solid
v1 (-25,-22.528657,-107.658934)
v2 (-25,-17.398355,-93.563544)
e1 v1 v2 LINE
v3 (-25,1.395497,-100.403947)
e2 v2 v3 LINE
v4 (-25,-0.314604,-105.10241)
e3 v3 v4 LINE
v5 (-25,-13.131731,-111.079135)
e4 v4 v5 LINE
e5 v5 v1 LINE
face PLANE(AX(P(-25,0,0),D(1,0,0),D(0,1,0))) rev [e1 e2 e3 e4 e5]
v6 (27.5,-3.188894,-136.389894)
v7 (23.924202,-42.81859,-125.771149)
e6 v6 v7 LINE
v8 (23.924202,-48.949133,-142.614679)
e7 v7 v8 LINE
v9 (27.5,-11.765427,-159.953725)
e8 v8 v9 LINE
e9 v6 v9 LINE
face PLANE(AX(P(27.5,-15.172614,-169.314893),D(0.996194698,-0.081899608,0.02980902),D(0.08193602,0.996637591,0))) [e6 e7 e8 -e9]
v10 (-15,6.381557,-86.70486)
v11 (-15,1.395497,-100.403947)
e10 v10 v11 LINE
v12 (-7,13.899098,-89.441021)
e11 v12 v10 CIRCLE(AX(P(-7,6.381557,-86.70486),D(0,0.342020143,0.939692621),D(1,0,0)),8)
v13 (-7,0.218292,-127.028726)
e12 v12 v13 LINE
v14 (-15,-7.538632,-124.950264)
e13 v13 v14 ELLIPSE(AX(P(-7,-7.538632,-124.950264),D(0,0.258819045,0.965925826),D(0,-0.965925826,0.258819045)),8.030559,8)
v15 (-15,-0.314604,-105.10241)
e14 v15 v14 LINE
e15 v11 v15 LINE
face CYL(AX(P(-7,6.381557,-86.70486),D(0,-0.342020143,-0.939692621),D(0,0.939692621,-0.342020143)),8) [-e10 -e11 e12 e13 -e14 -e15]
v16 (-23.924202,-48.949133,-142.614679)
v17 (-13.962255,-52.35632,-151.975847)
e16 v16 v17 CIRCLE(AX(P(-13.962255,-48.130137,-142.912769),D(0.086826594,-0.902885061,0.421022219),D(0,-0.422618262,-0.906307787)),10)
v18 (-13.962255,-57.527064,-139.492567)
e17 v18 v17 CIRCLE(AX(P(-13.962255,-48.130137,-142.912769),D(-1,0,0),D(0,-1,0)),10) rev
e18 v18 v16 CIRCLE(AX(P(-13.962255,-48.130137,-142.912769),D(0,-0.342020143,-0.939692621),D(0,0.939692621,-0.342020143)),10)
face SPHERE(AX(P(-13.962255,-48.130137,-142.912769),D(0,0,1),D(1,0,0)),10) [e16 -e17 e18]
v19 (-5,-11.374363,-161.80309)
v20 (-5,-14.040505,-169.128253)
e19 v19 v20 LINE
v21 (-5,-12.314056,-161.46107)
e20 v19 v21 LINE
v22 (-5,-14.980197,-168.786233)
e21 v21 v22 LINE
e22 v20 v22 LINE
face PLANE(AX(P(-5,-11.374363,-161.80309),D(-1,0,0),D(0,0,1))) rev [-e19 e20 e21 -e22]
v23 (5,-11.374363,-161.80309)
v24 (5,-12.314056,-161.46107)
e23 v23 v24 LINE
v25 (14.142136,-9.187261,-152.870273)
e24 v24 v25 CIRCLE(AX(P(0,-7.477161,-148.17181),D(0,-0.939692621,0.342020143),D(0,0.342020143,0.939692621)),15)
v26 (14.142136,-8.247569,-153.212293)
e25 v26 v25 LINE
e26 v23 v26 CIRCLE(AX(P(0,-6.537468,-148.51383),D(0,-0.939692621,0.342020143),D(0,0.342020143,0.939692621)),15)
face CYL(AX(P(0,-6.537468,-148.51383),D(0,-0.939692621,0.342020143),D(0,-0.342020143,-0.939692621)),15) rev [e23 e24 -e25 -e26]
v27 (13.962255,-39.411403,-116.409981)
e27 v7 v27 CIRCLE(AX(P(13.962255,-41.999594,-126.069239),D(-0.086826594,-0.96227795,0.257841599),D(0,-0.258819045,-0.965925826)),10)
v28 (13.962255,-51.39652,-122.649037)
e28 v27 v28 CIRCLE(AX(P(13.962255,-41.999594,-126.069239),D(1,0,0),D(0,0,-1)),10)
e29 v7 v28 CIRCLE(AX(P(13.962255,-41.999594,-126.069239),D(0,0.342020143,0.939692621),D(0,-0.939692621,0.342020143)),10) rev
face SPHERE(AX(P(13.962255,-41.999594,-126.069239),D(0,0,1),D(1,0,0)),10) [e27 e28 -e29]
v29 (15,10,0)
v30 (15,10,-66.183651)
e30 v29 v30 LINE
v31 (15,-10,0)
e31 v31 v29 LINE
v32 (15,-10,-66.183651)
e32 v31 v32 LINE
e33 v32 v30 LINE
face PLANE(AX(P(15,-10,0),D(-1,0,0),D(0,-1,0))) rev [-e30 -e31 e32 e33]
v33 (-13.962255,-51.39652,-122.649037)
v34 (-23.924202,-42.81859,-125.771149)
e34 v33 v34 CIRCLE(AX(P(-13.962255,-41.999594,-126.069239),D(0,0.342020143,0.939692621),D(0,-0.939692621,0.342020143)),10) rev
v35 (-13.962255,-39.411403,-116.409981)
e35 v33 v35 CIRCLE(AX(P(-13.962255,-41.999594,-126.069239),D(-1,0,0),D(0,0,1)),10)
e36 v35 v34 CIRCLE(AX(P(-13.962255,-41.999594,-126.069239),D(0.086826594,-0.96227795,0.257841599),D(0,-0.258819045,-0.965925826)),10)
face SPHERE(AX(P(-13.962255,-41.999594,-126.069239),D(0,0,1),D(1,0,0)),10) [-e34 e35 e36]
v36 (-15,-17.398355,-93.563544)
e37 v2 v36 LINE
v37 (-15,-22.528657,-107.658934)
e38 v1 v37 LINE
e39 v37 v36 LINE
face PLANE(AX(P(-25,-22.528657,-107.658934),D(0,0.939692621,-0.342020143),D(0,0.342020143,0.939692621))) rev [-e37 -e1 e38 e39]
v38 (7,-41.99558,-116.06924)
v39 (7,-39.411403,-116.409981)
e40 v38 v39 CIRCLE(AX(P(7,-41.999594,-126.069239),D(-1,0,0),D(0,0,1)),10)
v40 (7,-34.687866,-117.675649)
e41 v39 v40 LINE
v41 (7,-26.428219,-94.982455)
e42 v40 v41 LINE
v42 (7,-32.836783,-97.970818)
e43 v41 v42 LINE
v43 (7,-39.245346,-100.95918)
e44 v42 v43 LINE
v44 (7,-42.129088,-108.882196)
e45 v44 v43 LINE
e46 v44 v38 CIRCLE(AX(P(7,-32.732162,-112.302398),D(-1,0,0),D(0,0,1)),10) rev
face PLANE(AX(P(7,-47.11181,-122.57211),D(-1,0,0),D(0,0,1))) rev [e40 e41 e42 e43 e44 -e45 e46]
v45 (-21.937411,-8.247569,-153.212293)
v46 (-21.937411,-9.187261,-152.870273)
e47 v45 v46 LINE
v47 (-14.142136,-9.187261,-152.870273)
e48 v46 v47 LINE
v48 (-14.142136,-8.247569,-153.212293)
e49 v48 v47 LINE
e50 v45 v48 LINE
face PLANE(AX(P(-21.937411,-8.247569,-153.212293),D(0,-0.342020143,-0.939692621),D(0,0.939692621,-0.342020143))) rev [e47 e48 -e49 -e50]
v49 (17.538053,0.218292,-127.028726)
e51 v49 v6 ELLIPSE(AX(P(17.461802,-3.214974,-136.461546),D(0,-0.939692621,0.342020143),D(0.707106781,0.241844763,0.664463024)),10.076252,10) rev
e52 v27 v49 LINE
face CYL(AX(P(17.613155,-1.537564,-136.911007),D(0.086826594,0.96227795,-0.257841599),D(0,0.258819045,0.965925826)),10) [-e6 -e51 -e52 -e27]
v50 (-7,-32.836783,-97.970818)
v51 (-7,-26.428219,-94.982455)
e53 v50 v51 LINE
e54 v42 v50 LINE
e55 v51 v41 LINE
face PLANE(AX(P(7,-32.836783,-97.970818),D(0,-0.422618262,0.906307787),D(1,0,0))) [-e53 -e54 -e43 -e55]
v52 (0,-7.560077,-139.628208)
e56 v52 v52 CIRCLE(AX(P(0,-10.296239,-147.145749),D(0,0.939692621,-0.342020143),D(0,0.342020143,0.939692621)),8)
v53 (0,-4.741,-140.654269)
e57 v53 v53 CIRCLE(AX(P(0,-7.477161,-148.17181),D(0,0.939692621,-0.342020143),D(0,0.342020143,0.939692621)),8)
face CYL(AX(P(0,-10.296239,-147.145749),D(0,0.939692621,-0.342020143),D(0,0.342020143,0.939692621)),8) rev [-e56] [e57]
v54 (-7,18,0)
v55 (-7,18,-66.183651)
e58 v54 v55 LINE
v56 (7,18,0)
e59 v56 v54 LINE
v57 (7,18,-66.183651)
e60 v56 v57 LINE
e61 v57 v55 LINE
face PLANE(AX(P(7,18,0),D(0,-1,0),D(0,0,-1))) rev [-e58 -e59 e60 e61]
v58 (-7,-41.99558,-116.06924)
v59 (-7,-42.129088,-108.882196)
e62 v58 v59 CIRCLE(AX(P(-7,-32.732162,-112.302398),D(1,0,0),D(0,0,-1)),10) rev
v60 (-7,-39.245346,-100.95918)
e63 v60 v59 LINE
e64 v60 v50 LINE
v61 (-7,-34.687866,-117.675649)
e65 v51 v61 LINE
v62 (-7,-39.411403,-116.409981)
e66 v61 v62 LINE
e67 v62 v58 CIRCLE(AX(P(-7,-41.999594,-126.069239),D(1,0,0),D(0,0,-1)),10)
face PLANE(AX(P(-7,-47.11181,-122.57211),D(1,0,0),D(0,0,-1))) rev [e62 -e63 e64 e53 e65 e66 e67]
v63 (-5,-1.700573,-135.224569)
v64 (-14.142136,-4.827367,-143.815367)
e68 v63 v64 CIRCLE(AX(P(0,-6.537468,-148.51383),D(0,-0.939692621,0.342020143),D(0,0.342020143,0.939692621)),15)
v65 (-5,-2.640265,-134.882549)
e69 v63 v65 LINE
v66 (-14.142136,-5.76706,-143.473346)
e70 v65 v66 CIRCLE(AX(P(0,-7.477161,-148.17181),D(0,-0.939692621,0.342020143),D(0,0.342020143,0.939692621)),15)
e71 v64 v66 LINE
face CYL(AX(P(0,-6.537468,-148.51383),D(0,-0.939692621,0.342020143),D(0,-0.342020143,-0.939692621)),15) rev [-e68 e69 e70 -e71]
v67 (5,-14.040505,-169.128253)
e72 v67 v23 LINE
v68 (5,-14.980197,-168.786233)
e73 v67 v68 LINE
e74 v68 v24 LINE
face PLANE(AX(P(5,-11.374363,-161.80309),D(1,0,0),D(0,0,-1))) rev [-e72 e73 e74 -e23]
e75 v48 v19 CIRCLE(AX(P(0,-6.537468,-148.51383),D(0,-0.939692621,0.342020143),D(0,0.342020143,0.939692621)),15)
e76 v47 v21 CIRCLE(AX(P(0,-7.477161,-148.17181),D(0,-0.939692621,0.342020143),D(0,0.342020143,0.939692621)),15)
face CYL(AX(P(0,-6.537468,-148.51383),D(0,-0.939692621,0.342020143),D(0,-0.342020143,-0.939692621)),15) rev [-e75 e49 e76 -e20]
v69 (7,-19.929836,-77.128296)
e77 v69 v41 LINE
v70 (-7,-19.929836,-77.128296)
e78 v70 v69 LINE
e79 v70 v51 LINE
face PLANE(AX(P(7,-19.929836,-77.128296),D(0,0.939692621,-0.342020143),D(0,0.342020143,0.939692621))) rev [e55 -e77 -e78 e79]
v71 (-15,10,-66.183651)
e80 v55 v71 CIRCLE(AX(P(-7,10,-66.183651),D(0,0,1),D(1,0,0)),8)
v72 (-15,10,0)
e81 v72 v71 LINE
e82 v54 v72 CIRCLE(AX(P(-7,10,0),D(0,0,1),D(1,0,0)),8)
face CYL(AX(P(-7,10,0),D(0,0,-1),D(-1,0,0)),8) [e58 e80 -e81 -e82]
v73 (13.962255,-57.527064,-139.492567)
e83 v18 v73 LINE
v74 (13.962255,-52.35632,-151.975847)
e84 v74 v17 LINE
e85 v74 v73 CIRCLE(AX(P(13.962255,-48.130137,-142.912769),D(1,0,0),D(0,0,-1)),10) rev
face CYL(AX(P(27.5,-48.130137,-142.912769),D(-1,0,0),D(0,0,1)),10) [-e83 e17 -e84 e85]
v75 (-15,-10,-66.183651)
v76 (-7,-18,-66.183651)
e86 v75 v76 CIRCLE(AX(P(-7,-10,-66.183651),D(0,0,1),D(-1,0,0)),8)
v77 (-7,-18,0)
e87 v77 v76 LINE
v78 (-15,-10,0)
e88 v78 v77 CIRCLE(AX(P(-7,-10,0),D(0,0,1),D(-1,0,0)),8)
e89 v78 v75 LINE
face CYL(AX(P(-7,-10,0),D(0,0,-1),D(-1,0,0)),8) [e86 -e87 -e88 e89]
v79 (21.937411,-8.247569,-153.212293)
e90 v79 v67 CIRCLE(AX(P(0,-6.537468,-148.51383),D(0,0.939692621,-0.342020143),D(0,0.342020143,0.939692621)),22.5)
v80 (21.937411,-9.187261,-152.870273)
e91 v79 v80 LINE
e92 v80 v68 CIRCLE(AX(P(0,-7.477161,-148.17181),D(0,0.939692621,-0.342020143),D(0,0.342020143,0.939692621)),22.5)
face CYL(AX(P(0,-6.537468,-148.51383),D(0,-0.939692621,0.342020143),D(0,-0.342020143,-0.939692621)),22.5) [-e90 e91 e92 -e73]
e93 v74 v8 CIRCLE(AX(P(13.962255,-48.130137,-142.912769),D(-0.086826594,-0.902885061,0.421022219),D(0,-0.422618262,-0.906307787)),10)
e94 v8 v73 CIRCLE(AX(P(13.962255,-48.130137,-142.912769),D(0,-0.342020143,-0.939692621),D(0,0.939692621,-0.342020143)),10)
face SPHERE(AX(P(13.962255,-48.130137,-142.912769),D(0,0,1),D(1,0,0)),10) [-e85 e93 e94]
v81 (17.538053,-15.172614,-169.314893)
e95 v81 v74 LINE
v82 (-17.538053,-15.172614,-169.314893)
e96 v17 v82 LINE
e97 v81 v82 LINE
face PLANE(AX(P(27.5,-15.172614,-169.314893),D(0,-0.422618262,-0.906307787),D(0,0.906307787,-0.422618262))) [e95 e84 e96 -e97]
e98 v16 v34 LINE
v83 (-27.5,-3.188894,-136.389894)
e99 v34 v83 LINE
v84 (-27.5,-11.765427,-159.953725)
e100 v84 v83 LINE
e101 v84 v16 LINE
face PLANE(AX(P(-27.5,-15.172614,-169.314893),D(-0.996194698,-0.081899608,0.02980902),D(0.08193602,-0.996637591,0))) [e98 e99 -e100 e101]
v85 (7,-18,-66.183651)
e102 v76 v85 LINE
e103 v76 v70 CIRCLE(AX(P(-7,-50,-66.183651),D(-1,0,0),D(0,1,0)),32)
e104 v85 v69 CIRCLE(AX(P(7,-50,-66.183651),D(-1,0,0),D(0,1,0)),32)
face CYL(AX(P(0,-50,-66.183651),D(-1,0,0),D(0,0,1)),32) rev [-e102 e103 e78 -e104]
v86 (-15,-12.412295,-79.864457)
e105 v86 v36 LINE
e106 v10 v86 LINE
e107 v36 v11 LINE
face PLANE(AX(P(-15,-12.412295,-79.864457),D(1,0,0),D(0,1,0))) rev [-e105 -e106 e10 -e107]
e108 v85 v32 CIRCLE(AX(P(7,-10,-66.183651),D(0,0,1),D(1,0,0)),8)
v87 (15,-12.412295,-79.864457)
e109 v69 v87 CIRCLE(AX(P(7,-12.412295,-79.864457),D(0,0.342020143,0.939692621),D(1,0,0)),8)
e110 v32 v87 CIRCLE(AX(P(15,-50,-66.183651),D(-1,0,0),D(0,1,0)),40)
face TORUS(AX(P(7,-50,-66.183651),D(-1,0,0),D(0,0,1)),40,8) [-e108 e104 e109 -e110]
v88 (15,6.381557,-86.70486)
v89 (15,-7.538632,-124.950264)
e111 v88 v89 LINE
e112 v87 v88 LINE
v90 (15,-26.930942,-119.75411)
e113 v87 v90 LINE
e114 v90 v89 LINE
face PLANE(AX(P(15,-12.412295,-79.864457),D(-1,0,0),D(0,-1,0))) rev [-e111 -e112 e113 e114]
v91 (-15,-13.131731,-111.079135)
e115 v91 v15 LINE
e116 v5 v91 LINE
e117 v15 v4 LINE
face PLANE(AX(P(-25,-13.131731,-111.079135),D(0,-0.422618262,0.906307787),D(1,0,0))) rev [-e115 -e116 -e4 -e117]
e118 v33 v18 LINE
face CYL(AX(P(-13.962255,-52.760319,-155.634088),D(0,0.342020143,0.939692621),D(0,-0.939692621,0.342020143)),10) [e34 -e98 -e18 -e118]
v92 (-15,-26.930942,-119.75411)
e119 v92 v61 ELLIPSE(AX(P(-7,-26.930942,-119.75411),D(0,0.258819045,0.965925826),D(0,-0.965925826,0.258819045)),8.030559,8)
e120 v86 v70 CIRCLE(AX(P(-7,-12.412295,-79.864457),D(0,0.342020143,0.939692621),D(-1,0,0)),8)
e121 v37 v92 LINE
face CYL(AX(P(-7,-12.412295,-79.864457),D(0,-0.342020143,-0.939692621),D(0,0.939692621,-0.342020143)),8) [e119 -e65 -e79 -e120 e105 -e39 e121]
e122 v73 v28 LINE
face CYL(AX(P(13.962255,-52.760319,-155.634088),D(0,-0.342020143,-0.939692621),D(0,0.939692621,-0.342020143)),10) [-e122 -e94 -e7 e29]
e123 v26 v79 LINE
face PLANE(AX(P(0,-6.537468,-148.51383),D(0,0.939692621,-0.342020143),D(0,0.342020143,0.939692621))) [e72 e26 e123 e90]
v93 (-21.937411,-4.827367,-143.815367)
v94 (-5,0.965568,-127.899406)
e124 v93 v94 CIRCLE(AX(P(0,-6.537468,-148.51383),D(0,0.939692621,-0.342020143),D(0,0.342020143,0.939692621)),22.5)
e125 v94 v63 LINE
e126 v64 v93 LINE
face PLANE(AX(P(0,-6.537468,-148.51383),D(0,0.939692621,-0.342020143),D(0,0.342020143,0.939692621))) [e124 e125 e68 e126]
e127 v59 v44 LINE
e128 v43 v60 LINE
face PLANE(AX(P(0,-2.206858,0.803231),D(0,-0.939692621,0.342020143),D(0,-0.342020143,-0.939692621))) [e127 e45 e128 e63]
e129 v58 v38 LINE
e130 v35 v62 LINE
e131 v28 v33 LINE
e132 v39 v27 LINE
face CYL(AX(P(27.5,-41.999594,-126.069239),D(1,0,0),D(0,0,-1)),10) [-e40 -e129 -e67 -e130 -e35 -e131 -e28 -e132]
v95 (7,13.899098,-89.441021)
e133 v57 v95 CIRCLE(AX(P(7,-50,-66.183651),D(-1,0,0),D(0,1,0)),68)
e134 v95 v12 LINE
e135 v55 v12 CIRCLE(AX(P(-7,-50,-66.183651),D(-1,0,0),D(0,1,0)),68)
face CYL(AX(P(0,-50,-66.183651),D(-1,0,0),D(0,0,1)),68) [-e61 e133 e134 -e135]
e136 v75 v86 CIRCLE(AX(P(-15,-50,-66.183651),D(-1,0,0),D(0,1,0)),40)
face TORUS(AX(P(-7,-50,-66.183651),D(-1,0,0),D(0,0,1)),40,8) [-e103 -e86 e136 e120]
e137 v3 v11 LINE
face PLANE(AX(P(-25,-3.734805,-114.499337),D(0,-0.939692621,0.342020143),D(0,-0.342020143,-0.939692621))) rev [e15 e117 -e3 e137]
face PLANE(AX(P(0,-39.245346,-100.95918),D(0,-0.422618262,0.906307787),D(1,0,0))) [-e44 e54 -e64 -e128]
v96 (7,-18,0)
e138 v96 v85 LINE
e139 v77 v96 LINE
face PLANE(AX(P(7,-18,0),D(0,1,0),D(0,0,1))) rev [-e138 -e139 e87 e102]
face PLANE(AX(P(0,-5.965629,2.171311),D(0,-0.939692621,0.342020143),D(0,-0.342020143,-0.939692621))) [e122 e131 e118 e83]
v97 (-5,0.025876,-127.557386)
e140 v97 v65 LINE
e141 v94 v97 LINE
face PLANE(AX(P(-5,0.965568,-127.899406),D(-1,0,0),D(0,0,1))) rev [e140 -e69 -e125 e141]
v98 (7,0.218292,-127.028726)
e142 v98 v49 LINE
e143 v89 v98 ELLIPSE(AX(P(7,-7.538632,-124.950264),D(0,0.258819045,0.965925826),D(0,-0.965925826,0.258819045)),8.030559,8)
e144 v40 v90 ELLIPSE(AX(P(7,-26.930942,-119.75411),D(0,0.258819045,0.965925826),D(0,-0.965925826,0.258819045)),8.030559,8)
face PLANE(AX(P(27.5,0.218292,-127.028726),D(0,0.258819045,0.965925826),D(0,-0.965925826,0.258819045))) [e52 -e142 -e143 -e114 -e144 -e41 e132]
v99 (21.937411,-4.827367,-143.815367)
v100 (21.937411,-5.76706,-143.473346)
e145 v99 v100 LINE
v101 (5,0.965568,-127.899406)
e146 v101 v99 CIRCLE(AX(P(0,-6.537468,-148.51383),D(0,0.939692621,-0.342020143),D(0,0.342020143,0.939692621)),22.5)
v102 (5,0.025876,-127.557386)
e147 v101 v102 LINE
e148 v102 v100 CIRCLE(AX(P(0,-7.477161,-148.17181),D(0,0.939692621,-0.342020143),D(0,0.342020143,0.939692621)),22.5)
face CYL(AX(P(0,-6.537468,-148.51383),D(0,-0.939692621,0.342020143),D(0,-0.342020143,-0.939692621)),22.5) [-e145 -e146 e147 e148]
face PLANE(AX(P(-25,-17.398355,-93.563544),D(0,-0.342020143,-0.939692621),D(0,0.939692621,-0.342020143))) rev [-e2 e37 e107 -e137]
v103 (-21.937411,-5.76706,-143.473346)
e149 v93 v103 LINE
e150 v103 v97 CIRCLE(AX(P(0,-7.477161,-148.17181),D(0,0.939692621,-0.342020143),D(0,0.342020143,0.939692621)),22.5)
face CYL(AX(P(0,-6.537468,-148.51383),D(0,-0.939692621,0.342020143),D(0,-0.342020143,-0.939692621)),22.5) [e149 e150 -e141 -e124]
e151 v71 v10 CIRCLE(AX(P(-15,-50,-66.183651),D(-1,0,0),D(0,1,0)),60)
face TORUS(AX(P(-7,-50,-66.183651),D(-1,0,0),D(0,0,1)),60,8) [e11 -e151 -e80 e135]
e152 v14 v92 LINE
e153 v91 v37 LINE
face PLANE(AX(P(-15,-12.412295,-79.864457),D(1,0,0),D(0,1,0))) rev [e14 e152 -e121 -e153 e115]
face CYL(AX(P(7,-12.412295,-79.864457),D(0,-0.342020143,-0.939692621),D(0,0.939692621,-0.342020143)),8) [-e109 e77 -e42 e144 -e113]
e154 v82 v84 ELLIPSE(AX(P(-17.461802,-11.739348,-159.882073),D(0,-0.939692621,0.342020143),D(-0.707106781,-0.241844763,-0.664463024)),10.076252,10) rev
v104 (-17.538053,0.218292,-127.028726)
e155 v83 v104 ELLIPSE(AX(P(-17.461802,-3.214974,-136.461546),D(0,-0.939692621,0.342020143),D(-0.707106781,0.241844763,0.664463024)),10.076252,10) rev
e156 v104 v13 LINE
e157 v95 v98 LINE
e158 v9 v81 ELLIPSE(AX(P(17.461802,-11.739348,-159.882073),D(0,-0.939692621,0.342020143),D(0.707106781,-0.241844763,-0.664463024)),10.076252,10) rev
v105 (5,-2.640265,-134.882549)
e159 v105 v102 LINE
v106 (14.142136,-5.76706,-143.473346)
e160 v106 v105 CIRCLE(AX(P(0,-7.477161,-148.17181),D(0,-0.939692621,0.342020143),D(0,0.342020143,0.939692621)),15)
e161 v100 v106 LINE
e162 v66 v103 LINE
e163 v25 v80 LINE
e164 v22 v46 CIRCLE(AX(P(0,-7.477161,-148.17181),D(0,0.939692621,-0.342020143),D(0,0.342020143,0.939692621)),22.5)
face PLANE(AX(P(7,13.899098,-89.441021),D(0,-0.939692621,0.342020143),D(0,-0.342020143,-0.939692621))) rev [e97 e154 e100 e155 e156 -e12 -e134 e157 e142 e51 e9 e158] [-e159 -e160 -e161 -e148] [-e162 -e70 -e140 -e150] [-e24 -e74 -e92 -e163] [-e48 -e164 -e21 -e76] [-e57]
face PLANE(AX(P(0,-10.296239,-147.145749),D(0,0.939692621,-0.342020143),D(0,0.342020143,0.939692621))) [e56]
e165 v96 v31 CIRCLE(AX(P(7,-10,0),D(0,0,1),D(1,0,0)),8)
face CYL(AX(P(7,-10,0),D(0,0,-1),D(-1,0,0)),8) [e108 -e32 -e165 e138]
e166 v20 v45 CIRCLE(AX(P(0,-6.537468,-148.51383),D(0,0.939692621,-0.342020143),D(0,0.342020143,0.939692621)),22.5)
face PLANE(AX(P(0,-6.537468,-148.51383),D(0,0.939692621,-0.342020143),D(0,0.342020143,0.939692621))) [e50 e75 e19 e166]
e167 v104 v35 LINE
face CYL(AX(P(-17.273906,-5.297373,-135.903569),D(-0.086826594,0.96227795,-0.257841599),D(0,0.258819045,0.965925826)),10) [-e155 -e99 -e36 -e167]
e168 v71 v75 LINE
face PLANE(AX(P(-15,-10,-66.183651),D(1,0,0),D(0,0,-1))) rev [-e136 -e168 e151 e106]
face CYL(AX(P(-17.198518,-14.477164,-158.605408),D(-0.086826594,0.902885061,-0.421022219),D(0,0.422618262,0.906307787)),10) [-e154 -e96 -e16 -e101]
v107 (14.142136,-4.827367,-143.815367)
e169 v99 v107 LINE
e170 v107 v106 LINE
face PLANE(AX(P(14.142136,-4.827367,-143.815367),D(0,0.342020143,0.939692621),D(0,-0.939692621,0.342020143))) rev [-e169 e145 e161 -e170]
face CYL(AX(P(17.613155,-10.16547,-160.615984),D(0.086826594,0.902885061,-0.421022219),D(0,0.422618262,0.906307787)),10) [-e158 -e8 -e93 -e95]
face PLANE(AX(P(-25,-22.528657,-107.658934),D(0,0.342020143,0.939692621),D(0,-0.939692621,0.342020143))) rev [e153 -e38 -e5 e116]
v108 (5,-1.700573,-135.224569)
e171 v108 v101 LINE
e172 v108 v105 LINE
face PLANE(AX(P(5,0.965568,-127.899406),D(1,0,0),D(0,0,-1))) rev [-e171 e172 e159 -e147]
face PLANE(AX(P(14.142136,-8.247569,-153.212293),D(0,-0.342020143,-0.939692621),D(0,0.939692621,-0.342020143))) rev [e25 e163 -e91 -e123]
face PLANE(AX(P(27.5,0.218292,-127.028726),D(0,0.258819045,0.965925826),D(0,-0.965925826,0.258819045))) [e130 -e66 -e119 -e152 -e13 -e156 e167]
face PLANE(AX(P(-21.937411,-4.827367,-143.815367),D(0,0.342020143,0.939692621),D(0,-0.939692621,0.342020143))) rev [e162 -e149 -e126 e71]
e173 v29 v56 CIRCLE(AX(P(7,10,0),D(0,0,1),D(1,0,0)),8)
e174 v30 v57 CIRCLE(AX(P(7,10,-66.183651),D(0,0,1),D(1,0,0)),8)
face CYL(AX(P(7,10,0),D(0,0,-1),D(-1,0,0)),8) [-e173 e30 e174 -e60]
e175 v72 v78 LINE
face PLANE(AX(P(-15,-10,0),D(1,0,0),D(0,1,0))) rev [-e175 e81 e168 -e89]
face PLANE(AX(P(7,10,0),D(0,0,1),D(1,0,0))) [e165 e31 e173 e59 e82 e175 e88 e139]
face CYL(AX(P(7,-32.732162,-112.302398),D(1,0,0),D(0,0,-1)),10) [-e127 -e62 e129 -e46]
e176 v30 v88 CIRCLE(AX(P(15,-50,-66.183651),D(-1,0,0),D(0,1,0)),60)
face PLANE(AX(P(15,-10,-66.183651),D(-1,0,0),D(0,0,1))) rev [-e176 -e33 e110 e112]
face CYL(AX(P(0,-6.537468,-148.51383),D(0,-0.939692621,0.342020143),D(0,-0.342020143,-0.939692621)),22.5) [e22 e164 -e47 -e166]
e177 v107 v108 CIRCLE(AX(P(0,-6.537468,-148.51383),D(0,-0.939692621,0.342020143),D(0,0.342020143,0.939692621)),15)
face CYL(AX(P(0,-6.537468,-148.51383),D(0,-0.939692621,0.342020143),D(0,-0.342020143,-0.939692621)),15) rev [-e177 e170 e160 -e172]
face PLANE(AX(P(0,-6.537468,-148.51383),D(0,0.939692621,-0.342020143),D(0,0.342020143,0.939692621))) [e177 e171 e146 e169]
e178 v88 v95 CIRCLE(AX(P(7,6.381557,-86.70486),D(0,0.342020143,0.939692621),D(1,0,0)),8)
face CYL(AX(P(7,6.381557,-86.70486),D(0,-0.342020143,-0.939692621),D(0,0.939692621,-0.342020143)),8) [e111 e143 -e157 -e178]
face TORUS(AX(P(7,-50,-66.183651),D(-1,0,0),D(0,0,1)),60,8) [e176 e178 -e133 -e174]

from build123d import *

# Parameters (mm, degrees)
SKETCH3_W           = 14
SKETCH3_H           = 28
BOSS_EXTRUDE1_DEPTH = 10
CHAMFER1_SIZE       = 5
SKETCH4_W           = 14
SKETCH4_H           = 10
CUT_EXTRUDE1_DEPTH  = 5
FILLET1_R           = 10
FILLET2_R           = 10
SKETCH5_W           = 55
SKETCH5_H           = 45
BOSS_EXTRUDE2_DEPTH = 50
BOSS_EXTRUDE2_DRAFT = -5
BOSS_EXTRUDE3_DEPTH = 10
CHAMFER2_SIZE       = 10
SKETCH7_R           = 8
CUT_EXTRUDE2_DEPTH  = 3
BOSS_EXTRUDE4_DEPTH = 1
FILLET3_R           = 10


# Some blends are built 0.0001 mm under size
with BuildPart() as part:
    # Sweep1: sweep along a path in Sketch2
    with BuildLine(Plane(origin=(0, 0, 0), x_dir=(0, 0, -1), z_dir=(1, 0, 0))) as sweep1_path:
        Line((0, 0), (66.183650965, 0))
        ThreePointArc((66.183650965, 0), (74.866059848, -0.759612349), (83.284658131, -3.015368961))
        Line((83.284658131, -3.015368961), (136.080020351, -22.231309316))
    # Sketch1 → Sweep1 (sweep)
    with BuildSketch(Plane.XY):
        with BuildLine():
            Line((7, -18), (-7, -18))
            ThreePointArc((-7, -18), (-12.656854249, -15.656854249), (-15, -10))
            Line((-15, -10), (-15, 10))
            ThreePointArc((-15, 10), (-12.656854249, 15.656854249), (-7, 18))
            Line((-7, 18), (7, 18))
            ThreePointArc((7, 18), (12.656854249, 15.656854249), (15, 10))
            Line((15, 10), (15, -10))
            ThreePointArc((15, -10), (12.656854249, -15.656854249), (7, -18))
        make_face()
    sweep(path=sweep1_path.line)

    # Sketch3 → Boss-Extrude1 (add)
    with BuildSketch(Plane(origin=(0, 7.190068189, -2.616970803), x_dir=(1, 0, 0), z_dir=(0, -0.939692620785908, 0.3420201433256697))):
        with Locations((0, -117.293295594)):
            Rectangle(SKETCH3_W, SKETCH3_H)
    extrude(amount=BOSS_EXTRUDE1_DEPTH)

    # Chamfer1
    chamfer1_edges = [part.edges().sort_by_distance(p)[0] for p in [
        (0, -28.138319575, -99.68091845),
    ]]
    chamfer(chamfer1_edges, length=CHAMFER1_SIZE)
    chamfer1_2_edges = [part.edges().sort_by_distance(p)[0] for p in [
        (0, -37.535245783, -96.260717017),
    ]]
    chamfer(chamfer1_2_edges, length=CHAMFER1_SIZE - 0.0001)  # a hair under: the kernel refuses the full size

    # Sketch4 → Cut-Extrude1 (cut)
    with BuildSketch(Plane(origin=(0, -2.206858019, 0.80323063), x_dir=(1, 0, 0), z_dir=(0, -0.9396926207859079, 0.34202014332567005))):
        with Locations((0, -126.293295594)):
            Rectangle(SKETCH4_W, SKETCH4_H)
    extrude(amount=-CUT_EXTRUDE1_DEPTH, mode=Mode.SUBTRACT)

    # Fillet1
    # the kernel refuses this fillet: 10 mm, written as the material it adds along each edge
    with BuildSketch(Plane(origin=(-7, -38.993145258, -114.885284907), x_dir=(0, -0.9396926207859382, 0.34202014332558694), z_dir=(1, 0, 0))) as fillet1_piece_1:
        with BuildLine():
            CenterArc((10, 8.660254038), FILLET1_R, 180, 60)
            Line((0, 8.660254038), (-0.2, 8.660254038))
            Line((-0.2, 8.660254038), (-0.2, 0))
            Line((-0.2, 0), (0, -0.2))
            ThreePointArc((0, -0.2), (2.5, -0.2), (4.9, -0.173205081))
            Line((4.9, -0.173205081), (5, 0))
        make_face()
    extrude(amount=14)

    # Fillet2
    fillet2_edges = [part.edges().sort_by_distance(p)[0] for p in [
        (0, -43.691608362, -113.175184191),
    ]]
    fillet(fillet2_edges, radius=FILLET2_R)


with BuildPart() as boss_extrude2_tool:
    # Sketch5 → Boss-Extrude2 (with draft: the straight prism first)
    with BuildSketch(Plane(origin=(0, 41.019002537, -14.929695963), x_dir=(1, 0, 0), z_dir=(0, 0.939692620785908, -0.34202014332566977))):
        with Locations((0, 141.793295594)):
            Rectangle(SKETCH5_W, SKETCH5_H)
    extrude(amount=-BOSS_EXTRUDE2_DEPTH)
    # Boss-Extrude2: the draft: its side faces are tilted about the plane it starts from
    boss_extrude2_sides = [boss_extrude2_tool.faces().sort_by_distance(p)[0] for p in [
        (0, -38.664929489, -160.764389894),
        (-27.5, -30.969476264, -139.621305927),
        (0, -23.274023039, -118.478221959),
        (27.5, -30.969476264, -139.621305927),
    ]]
    draft(boss_extrude2_sides, Plane(origin=(0, 41.019002537, -14.929695963), x_dir=(1, 0, 0), z_dir=(0, 0.939692620785908, -0.34202014332566977)), BOSS_EXTRUDE2_DRAFT)


with BuildPart() as part_1:
    add(part.part)

    # Boss-Extrude2: add boss_extrude2_tool
    add(boss_extrude2_tool.part)

    # Sketch6 → Boss-Extrude3 (add)
    with BuildSketch(Plane.ZY.offset(15)):
        Polygon((-107.658933731, -22.528657486), (-93.563544419, -17.398355336), (-100.403947286, 1.39549708), (-114.499336598, -3.73480507), align=None)
    extrude(amount=BOSS_EXTRUDE3_DEPTH)

    # Chamfer2
    chamfer2_edges = [part_1.edges().sort_by_distance(p)[0] for p in [
        (-20, -3.73480507, -114.499336598),
    ]]
    chamfer(chamfer2_edges, length=CHAMFER2_SIZE)

    # Sketch7 → Cut-Extrude2 (cut)
    with BuildSketch(Plane(origin=(0, 41.019002537, -14.929695963), x_dir=(1, 0, 0), z_dir=(0, 0.9396926207859081, -0.3420201433256698))):
        with Locations(Location((0, 141.793295594, 0), (0, 0, 270))):
            Circle(SKETCH7_R)
    extrude(amount=-CUT_EXTRUDE2_DEPTH, mode=Mode.SUBTRACT)

    # Sketch10 → Boss-Extrude4 (add)
    with BuildSketch(Plane(origin=(0, 41.019002537, -14.929695963), x_dir=(1, 0, 0), z_dir=(0, 0.9396926207859081, -0.3420201433256698))):
        with BuildLine():
            Line((14.142135624, 136.793295594), (21.937410968, 136.793295594))
            ThreePointArc((21.937410968, 136.793295594), (15.909902577, 125.883393018), (5, 119.855884626))
            Line((5, 119.855884626), (5, 127.651159971))
            ThreePointArc((5, 127.651159971), (10.606601718, 131.186693877), (14.142135624, 136.793295594))
        make_face()
        with BuildLine():
            Line((-5, 119.855884626), (-5, 127.651159971))
            ThreePointArc((-5, 127.651159971), (-10.606601718, 131.186693877), (-14.142135624, 136.793295594))
            Line((-14.142135624, 136.793295594), (-21.937410968, 136.793295594))
            ThreePointArc((-21.937410968, 136.793295594), (-15.909902577, 125.883393018), (-5, 119.855884626))
        make_face()
        with BuildLine():
            Line((-21.937410968, 146.793295594), (-14.142135624, 146.793295594))
            ThreePointArc((-14.142135624, 146.793295594), (-10.606601718, 152.399897312), (-5, 155.935431218))
            Line((-5, 155.935431218), (-5, 163.730706563))
            ThreePointArc((-5, 163.730706563), (-15.909902577, 157.703198171), (-21.937410968, 146.793295594))
        make_face()
        with BuildLine():
            Line((14.142135624, 146.793295594), (21.937410968, 146.793295594))
            ThreePointArc((21.937410968, 146.793295594), (15.909902577, 157.703198171), (5, 163.730706563))
            Line((5, 163.730706563), (5, 155.935431218))
            ThreePointArc((5, 155.935431218), (10.606601718, 152.399897312), (14.142135624, 146.793295594))
        make_face()
    extrude(amount=BOSS_EXTRUDE4_DEPTH)

    # Fillet3
    # the kernel refuses this fillet: 10 mm, written as the material it takes off along each edge
    with BuildSketch(Plane(origin=(13.962255084, -48.130137344, -142.912768744), x_dir=(-0.05900350758284425, -0.38201671186492897, 0.9222699268374899), z_dir=(0.5431604763459367, -0.7874344840965063, -0.2914165921688819))) as fillet3_piece_1_section:
        Polygon((-19.642374915, -19.642374915), (19.642374915, -19.642374915), (19.642374915, 19.642374915), (-19.642374915, 19.642374915), align=None)
    fillet3_piece_1 = extrude(amount=19.642374915, mode=Mode.PRIVATE)
    fillet3_piece_1 = split(fillet3_piece_1, bisect_by=Plane(origin=(13.962255084, -48.130137344, -142.912768744), z_dir=(-0.0868265938642479, -0.9028850613880008, 0.42102221855897237)), keep=Keep.TOP, mode=Mode.PRIVATE)
    fillet3_piece_1 = split(fillet3_piece_1, bisect_by=Plane(origin=(13.962255084, -48.130137344, -142.912768744), z_dir=(1, 0, 0)), keep=Keep.TOP, mode=Mode.PRIVATE)
    fillet3_piece_1 = split(fillet3_piece_1, bisect_by=Plane(origin=(13.962255084, -48.130137344, -142.912768744), z_dir=(0, -0.34202014332566977, -0.939692620785908)), keep=Keep.TOP, mode=Mode.PRIVATE)
    fillet3_piece_1 = split(fillet3_piece_1, bisect_by=Plane(origin=(23.924202064, -48.949133427, -142.614678548), z_dir=(-0.9961946980917455, 0.08189960831908964, -0.02980901962620929)), keep=Keep.TOP, mode=Mode.PRIVATE)
    fillet3_piece_1 = split(fillet3_piece_1, bisect_by=Plane(origin=(13.962255084, -52.356319961, -151.975846615), z_dir=(0, 0.4226182617407007, 0.9063077870366494)), keep=Keep.TOP, mode=Mode.PRIVATE)
    fillet3_piece_1 = split(fillet3_piece_1, bisect_by=Plane(origin=(13.962255084, -57.527063552, -139.492567311), z_dir=(0, 0.939692620785908, -0.34202014332566977)), keep=Keep.TOP, mode=Mode.PRIVATE)
    fillet3_piece_1 = fillet3_piece_1 - Plane(origin=(13.962255084, -48.130137344, -142.912768744), x_dir=(-0.5431604763459367, 0.7874344840965063, 0.2914165921688819), z_dir=(-0.05900350758284425, -0.38201671186492897, 0.9222699268374899)) * Sphere(FILLET3_R, mode=Mode.PRIVATE)
    add(fillet3_piece_1, mode=Mode.SUBTRACT)
    with BuildSketch(Plane(origin=(-13.962255084, -48.130137344, -142.912768744), x_dir=(0.7359928340771044, -0.6135606983424445, 0.28610805238001186), z_dir=(-0.5431604763459367, -0.7874344840965063, -0.2914165921688819))) as fillet3_piece_2_section:
        Polygon((-19.642374915, -19.642374915), (19.642374915, -19.642374915), (19.642374915, 19.642374915), (-19.642374915, 19.642374915), align=None)
    fillet3_piece_2 = extrude(amount=19.642374915, mode=Mode.PRIVATE)
    fillet3_piece_2 = split(fillet3_piece_2, bisect_by=Plane(origin=(-13.962255084, -48.130137344, -142.912768744), z_dir=(-1, 0, 0)), keep=Keep.TOP, mode=Mode.PRIVATE)
    fillet3_piece_2 = split(fillet3_piece_2, bisect_by=Plane(origin=(-13.962255084, -48.130137344, -142.912768744), z_dir=(0, -0.34202014332566977, -0.939692620785908)), keep=Keep.TOP, mode=Mode.PRIVATE)
    fillet3_piece_2 = split(fillet3_piece_2, bisect_by=Plane(origin=(-13.962255084, -48.130137344, -142.912768744), z_dir=(0.0868265938642479, -0.9028850613880008, 0.42102221855897237)), keep=Keep.TOP, mode=Mode.PRIVATE)
    fillet3_piece_2 = split(fillet3_piece_2, bisect_by=Plane(origin=(-13.962255084, -52.356319961, -151.975846615), z_dir=(0, 0.4226182617407007, 0.9063077870366494)), keep=Keep.TOP, mode=Mode.PRIVATE)
    fillet3_piece_2 = split(fillet3_piece_2, bisect_by=Plane(origin=(-13.962255084, -57.527063552, -139.492567311), z_dir=(0, 0.939692620785908, -0.34202014332566977)), keep=Keep.TOP, mode=Mode.PRIVATE)
    fillet3_piece_2 = split(fillet3_piece_2, bisect_by=Plane(origin=(-23.924202064, -48.949133427, -142.614678548), z_dir=(0.9961946980917455, 0.08189960831908964, -0.02980901962620929)), keep=Keep.TOP, mode=Mode.PRIVATE)
    fillet3_piece_2 = fillet3_piece_2 - Plane(origin=(-13.962255084, -48.130137344, -142.912768744), x_dir=(0.5431604763459367, 0.7874344840965063, 0.2914165921688819), z_dir=(0.7359928340771044, -0.6135606983424445, 0.28610805238001186)) * Sphere(FILLET3_R, mode=Mode.PRIVATE)
    add(fillet3_piece_2, mode=Mode.SUBTRACT)
    with BuildSketch(Plane(origin=(-13.962255084, -41.999593808, -126.069238809), x_dir=(0.7071067811865476, 0.241844762647976, 0.6644630243886744), z_dir=(-0.5431604763459366, -0.4158908361591537, 0.7293911908807889))) as fillet3_piece_3_section:
        Polygon((-19.642374915, -19.642374915), (19.642374915, -19.642374915), (19.642374915, 19.642374915), (-19.642374915, 19.642374915), align=None)
    fillet3_piece_3 = extrude(amount=19.642374915, mode=Mode.PRIVATE)
    fillet3_piece_3 = split(fillet3_piece_3, bisect_by=Plane(origin=(-13.962255084, -41.999593808, -126.069238809), z_dir=(0, 0.34202014332566977, 0.939692620785908)), keep=Keep.TOP, mode=Mode.PRIVATE)
    fillet3_piece_3 = split(fillet3_piece_3, bisect_by=Plane(origin=(-13.962255084, -41.999593808, -126.069238809), z_dir=(0.08682659386424792, -0.9622779495438604, 0.2578415994745548)), keep=Keep.TOP, mode=Mode.PRIVATE)
    fillet3_piece_3 = split(fillet3_piece_3, bisect_by=Plane(origin=(-13.962255084, -41.999593808, -126.069238809), z_dir=(-1, 0, 0)), keep=Keep.TOP, mode=Mode.PRIVATE)
    fillet3_piece_3 = split(fillet3_piece_3, bisect_by=Plane(origin=(-13.962255084, -51.396520016, -122.649037376), z_dir=(0, 0.939692620785908, -0.34202014332566977)), keep=Keep.TOP, mode=Mode.PRIVATE)
    fillet3_piece_3 = split(fillet3_piece_3, bisect_by=Plane(origin=(-23.924202064, -42.818589891, -125.771148613), z_dir=(0.9961946980917455, 0.08189960831908964, -0.02980901962620929)), keep=Keep.TOP, mode=Mode.PRIVATE)
    fillet3_piece_3 = split(fillet3_piece_3, bisect_by=Plane(origin=(-13.962255084, -39.411403357, -116.409980546), z_dir=(0, -0.2588190451025215, -0.9659258262890682)), keep=Keep.TOP, mode=Mode.PRIVATE)
    fillet3_piece_3 = fillet3_piece_3 - Plane(origin=(-13.962255084, -41.999593808, -126.069238809), x_dir=(0.5431604763459366, 0.4158908361591537, -0.7293911908807889), z_dir=(0.7071067811865476, 0.241844762647976, 0.6644630243886744)) * Sphere(FILLET3_R, mode=Mode.PRIVATE)
    add(fillet3_piece_3, mode=Mode.SUBTRACT)
    with BuildSketch(Plane(origin=(13.962255084, -41.999593808, -126.069238809), x_dir=(0.05900350758284439, 0.8854654610603633, 0.46094414342963447), z_dir=(0.5431604763459366, -0.4158908361591537, 0.7293911908807889))) as fillet3_piece_4_section:
        Polygon((-19.642374915, -19.642374915), (19.642374915, -19.642374915), (19.642374915, 19.642374915), (-19.642374915, 19.642374915), align=None)
    fillet3_piece_4 = extrude(amount=19.642374915, mode=Mode.PRIVATE)
    fillet3_piece_4 = split(fillet3_piece_4, bisect_by=Plane(origin=(13.962255084, -41.999593808, -126.069238809), z_dir=(0, 0.34202014332566977, 0.939692620785908)), keep=Keep.TOP, mode=Mode.PRIVATE)
    fillet3_piece_4 = split(fillet3_piece_4, bisect_by=Plane(origin=(13.962255084, -41.999593808, -126.069238809), z_dir=(1, 0, 0)), keep=Keep.TOP, mode=Mode.PRIVATE)
    fillet3_piece_4 = split(fillet3_piece_4, bisect_by=Plane(origin=(13.962255084, -41.999593808, -126.069238809), z_dir=(-0.08682659386424792, -0.9622779495438604, 0.2578415994745548)), keep=Keep.TOP, mode=Mode.PRIVATE)
    fillet3_piece_4 = split(fillet3_piece_4, bisect_by=Plane(origin=(23.924202064, -42.818589891, -125.771148613), z_dir=(-0.9961946980917455, 0.08189960831908964, -0.02980901962620929)), keep=Keep.TOP, mode=Mode.PRIVATE)
    fillet3_piece_4 = split(fillet3_piece_4, bisect_by=Plane(origin=(13.962255084, -51.396520016, -122.649037376), z_dir=(0, 0.939692620785908, -0.34202014332566977)), keep=Keep.TOP, mode=Mode.PRIVATE)
    fillet3_piece_4 = split(fillet3_piece_4, bisect_by=Plane(origin=(13.962255084, -39.411403357, -116.409980546), z_dir=(0, -0.2588190451025215, -0.9659258262890682)), keep=Keep.TOP, mode=Mode.PRIVATE)
    fillet3_piece_4 = fillet3_piece_4 - Plane(origin=(13.962255084, -41.999593808, -126.069238809), x_dir=(-0.5431604763459366, 0.4158908361591537, -0.7293911908807889), z_dir=(0.05900350758284439, 0.8854654610603633, 0.46094414342963447)) * Sphere(FILLET3_R, mode=Mode.PRIVATE)
    add(fillet3_piece_4, mode=Mode.SUBTRACT)
    with BuildSketch(Plane(origin=(13.962255084, -60.661100747, -148.103263735), x_dir=(0, 0.9063077870366486, -0.4226182617407022), z_dir=(-1, 0, 0))) as fillet3_piece_5:
        with BuildLine():
            CenterArc((FILLET3_R * 0.916331174017, -FILLET3_R), FILLET3_R, 90, 85)
            Line((-FILLET3_R * 0.0798635240743, -FILLET3_R * 0.912844257252), (0, 0))
            Line((0, 0), (FILLET3_R * 0.916331174017, 0))
        make_face()
    extrude(amount=27.924510167, mode=Mode.SUBTRACT)
    with BuildSketch(Plane(origin=(-23.125566824, -57.527063552, -139.492567311), x_dir=(-0.08715574274765854, 0.9361168066628587, -0.3407186534216111), z_dir=(0, 0.34202014332566977, 0.939692620785908)), Plane(origin=(23.125566824, -51.396520016, -122.649037376), x_dir=(0.08715574274765832, 0.9361168066628587, -0.3407186534216111), z_dir=(0, -0.34202014332566977, -0.939692620785908))) as fillet3_piece_6:
        with BuildLine():
            CenterArc((FILLET3_R * 0.916331174017, -FILLET3_R), FILLET3_R, 90, 85)
            Line((-FILLET3_R * 0.0798635240743, -FILLET3_R * 0.912844257252), (0, 0))
            Line((0, 0), (FILLET3_R * 0.916331174017, 0))
        make_face()
    extrude(amount=17.924510167, mode=Mode.SUBTRACT)
    with BuildSketch(Plane(origin=(-13.962255084, -48.262482821, -114.038340952), x_dir=(0, 0.9659258262890681, -0.2588190451025217), z_dir=(1, 0, 0))) as fillet3_piece_7_section:
        with BuildLine():
            CenterArc((FILLET3_R * 0.916331174017, -FILLET3_R), FILLET3_R, 90, 85)
            Line((-FILLET3_R * 0.0798635240743, -FILLET3_R * 0.912844257252), (0, 0))
            Line((0, 0), (FILLET3_R * 0.916331174017, 0))
        make_face()
    fillet3_piece_7 = extrude(amount=27.924510167, mode=Mode.PRIVATE)
    fillet3_piece_7 = split(fillet3_piece_7, bisect_by=Plane(origin=(-7, -48.262482821, -114.038340952), z_dir=(-1, 0, 0)), keep=Keep.TOP, mode=Mode.PRIVATE)
    fillet3_piece_7 = fillet3_piece_7 & Plane(origin=(-13.962255084, -32.732162269, -112.30239752), x_dir=(0, -0.9309945262431326, -0.36503313836599144), z_dir=(1, 0, 0)) * Cylinder(10, 93, mode=Mode.PRIVATE)
    add(fillet3_piece_7, mode=Mode.SUBTRACT)
    with BuildSketch(Plane(origin=(-13.962255084, -48.262482821, -114.038340952), x_dir=(0, 0.9659258262890681, -0.2588190451025217), z_dir=(1, 0, 0))) as fillet3_piece_8_section:
        with BuildLine():
            CenterArc((FILLET3_R * 0.916331174017, -FILLET3_R), FILLET3_R, 90, 85)
            Line((-FILLET3_R * 0.0798635240743, -FILLET3_R * 0.912844257252), (0, 0))
            Line((0, 0), (FILLET3_R * 0.916331174017, 0))
        make_face()
    fillet3_piece_8 = extrude(amount=27.924510167, mode=Mode.PRIVATE)
    fillet3_piece_8 = split(fillet3_piece_8, bisect_by=Plane(origin=(-7, -48.262482821, -114.038340952), z_dir=(-1, 0, 0)), keep=Keep.TOP, mode=Mode.PRIVATE)
    fillet3_piece_8 = fillet3_piece_8 - Plane(origin=(-13.962255084, -32.732162269, -112.30239752), x_dir=(0, -0.9309945262431326, -0.36503313836599144), z_dir=(1, 0, 0)) * Cylinder(10, 93, mode=Mode.PRIVATE)
    add(fillet3_piece_8, mode=Mode.SUBTRACT)
    with BuildSketch(Plane(origin=(-13.962255084, -48.262482821, -114.038340952), x_dir=(0, 0.9659258262890681, -0.2588190451025217), z_dir=(1, 0, 0))) as fillet3_piece_9_section:
        with BuildLine():
            CenterArc((FILLET3_R * 0.916331174017, -FILLET3_R), FILLET3_R, 90, 85)
            Line((-FILLET3_R * 0.0798635240743, -FILLET3_R * 0.912844257252), (0, 0))
            Line((0, 0), (FILLET3_R * 0.916331174017, 0))
        make_face()
    fillet3_piece_9 = extrude(amount=27.924510167, mode=Mode.PRIVATE)
    fillet3_piece_9 = split(fillet3_piece_9, bisect_by=Plane(origin=(-7, -48.262482821, -114.038340952), z_dir=(1, 0, 0)), keep=Keep.TOP, mode=Mode.PRIVATE)
    fillet3_piece_9 = fillet3_piece_9 - Plane(origin=(-13.962255084, -32.732162269, -112.30239752), x_dir=(0, -0.9309945262431326, -0.36503313836599144), z_dir=(1, 0, 0)) * Cylinder(10, 93, mode=Mode.PRIVATE)
    fillet3_piece_9 = split(fillet3_piece_9, bisect_by=Plane(origin=(7, -48.262482821, -114.038340952), z_dir=(-1, 0, 0)), keep=Keep.TOP, mode=Mode.PRIVATE)
    add(fillet3_piece_9, mode=Mode.SUBTRACT)
    with BuildSketch(Plane(origin=(-13.962255084, -48.262482821, -114.038340952), x_dir=(0, 0.9659258262890681, -0.2588190451025217), z_dir=(1, 0, 0))) as fillet3_piece_10_section:
        with BuildLine():
            CenterArc((FILLET3_R * 0.916331174017, -FILLET3_R), FILLET3_R, 90, 85)
            Line((-FILLET3_R * 0.0798635240743, -FILLET3_R * 0.912844257252), (0, 0))
            Line((0, 0), (FILLET3_R * 0.916331174017, 0))
        make_face()
    fillet3_piece_10 = extrude(amount=27.924510167, mode=Mode.PRIVATE)
    fillet3_piece_10 = fillet3_piece_10 & Plane(origin=(-13.962255084, -32.732162269, -112.30239752), x_dir=(0, -0.9309945262431326, -0.36503313836599144), z_dir=(1, 0, 0)) * Cylinder(10, 93, mode=Mode.PRIVATE)
    fillet3_piece_10 = split(fillet3_piece_10, bisect_by=Plane(origin=(7, -48.262482821, -114.038340952), z_dir=(1, 0, 0)), keep=Keep.TOP, mode=Mode.PRIVATE)
    add(fillet3_piece_10, mode=Mode.SUBTRACT)
    with BuildSketch(Plane(origin=(-13.962255084, -48.262482821, -114.038340952), x_dir=(0, 0.9659258262890681, -0.2588190451025217), z_dir=(1, 0, 0))) as fillet3_piece_11_section:
        with BuildLine():
            CenterArc((FILLET3_R * 0.916331174017, -FILLET3_R), FILLET3_R, 90, 85)
            Line((-FILLET3_R * 0.0798635240743, -FILLET3_R * 0.912844257252), (0, 0))
            Line((0, 0), (FILLET3_R * 0.916331174017, 0))
        make_face()
    fillet3_piece_11 = extrude(amount=27.924510167, mode=Mode.PRIVATE)
    fillet3_piece_11 = fillet3_piece_11 - Plane(origin=(-13.962255084, -32.732162269, -112.30239752), x_dir=(0, -0.9309945262431326, -0.36503313836599144), z_dir=(1, 0, 0)) * Cylinder(10, 93, mode=Mode.PRIVATE)
    fillet3_piece_11 = split(fillet3_piece_11, bisect_by=Plane(origin=(7, -48.262482821, -114.038340952), z_dir=(1, 0, 0)), keep=Keep.TOP, mode=Mode.PRIVATE)
    add(fillet3_piece_11, mode=Mode.SUBTRACT)
    with BuildSketch(Plane(origin=(29.65423836, 7.228698204, -179.760796897), x_dir=(0.007567436278487963, 0.4220083175478485, 0.906560375170129), z_dir=(-0.08682659386424792, -0.9028850613880008, 0.42102221855897237)), Plane(origin=(29.65423836, 24.093190479, -133.42598518), x_dir=(-0.9962234400966145, 0.08386804942218848, -0.022472376113451063), z_dir=(-0.08682659386424793, -0.9622779495438604, 0.2578415994745548)), Plane(origin=(-29.65423836, 7.228698204, -179.760796897), x_dir=(0.9962234400966147, 0.07869161814103695, -0.036694504171773175), z_dir=(0.08682659386424792, -0.9028850613880008, 0.42102221855897237))) as fillet3_piece_12:
        with BuildLine():
            CenterArc((FILLET3_R * 0.992432509139, FILLET3_R), FILLET3_R, 180.435230002, 89.564769998)
            Line((-FILLET3_R * 0.00753863989878, FILLET3_R * 0.992403876506), (0, 0))
            Line((0, 0), (FILLET3_R * 0.992432509139, 0))
        make_face()
    extrude(amount=66.858985653, mode=Mode.SUBTRACT)
    with BuildSketch(Plane(origin=(-29.65423836, 24.093190479, -133.42598518), x_dir=(0.9962234400966145, 0.08386804942218848, -0.022472376113451063), z_dir=(0.08682659386424793, -0.9622779495438604, 0.2578415994745548))) as fillet3_piece_13:
        with BuildLine():
            CenterArc((FILLET3_R * 0.992432509139, -FILLET3_R), FILLET3_R, 90, 89.564769998)
            Line((-FILLET3_R * 0.00753863989877, -FILLET3_R * 0.992403876506), (0, 0))
            Line((0, 0), (FILLET3_R * 0.992432509139, 0))
        make_face()
    extrude(amount=66.858985653, mode=Mode.SUBTRACT)


solid = part_1.part
